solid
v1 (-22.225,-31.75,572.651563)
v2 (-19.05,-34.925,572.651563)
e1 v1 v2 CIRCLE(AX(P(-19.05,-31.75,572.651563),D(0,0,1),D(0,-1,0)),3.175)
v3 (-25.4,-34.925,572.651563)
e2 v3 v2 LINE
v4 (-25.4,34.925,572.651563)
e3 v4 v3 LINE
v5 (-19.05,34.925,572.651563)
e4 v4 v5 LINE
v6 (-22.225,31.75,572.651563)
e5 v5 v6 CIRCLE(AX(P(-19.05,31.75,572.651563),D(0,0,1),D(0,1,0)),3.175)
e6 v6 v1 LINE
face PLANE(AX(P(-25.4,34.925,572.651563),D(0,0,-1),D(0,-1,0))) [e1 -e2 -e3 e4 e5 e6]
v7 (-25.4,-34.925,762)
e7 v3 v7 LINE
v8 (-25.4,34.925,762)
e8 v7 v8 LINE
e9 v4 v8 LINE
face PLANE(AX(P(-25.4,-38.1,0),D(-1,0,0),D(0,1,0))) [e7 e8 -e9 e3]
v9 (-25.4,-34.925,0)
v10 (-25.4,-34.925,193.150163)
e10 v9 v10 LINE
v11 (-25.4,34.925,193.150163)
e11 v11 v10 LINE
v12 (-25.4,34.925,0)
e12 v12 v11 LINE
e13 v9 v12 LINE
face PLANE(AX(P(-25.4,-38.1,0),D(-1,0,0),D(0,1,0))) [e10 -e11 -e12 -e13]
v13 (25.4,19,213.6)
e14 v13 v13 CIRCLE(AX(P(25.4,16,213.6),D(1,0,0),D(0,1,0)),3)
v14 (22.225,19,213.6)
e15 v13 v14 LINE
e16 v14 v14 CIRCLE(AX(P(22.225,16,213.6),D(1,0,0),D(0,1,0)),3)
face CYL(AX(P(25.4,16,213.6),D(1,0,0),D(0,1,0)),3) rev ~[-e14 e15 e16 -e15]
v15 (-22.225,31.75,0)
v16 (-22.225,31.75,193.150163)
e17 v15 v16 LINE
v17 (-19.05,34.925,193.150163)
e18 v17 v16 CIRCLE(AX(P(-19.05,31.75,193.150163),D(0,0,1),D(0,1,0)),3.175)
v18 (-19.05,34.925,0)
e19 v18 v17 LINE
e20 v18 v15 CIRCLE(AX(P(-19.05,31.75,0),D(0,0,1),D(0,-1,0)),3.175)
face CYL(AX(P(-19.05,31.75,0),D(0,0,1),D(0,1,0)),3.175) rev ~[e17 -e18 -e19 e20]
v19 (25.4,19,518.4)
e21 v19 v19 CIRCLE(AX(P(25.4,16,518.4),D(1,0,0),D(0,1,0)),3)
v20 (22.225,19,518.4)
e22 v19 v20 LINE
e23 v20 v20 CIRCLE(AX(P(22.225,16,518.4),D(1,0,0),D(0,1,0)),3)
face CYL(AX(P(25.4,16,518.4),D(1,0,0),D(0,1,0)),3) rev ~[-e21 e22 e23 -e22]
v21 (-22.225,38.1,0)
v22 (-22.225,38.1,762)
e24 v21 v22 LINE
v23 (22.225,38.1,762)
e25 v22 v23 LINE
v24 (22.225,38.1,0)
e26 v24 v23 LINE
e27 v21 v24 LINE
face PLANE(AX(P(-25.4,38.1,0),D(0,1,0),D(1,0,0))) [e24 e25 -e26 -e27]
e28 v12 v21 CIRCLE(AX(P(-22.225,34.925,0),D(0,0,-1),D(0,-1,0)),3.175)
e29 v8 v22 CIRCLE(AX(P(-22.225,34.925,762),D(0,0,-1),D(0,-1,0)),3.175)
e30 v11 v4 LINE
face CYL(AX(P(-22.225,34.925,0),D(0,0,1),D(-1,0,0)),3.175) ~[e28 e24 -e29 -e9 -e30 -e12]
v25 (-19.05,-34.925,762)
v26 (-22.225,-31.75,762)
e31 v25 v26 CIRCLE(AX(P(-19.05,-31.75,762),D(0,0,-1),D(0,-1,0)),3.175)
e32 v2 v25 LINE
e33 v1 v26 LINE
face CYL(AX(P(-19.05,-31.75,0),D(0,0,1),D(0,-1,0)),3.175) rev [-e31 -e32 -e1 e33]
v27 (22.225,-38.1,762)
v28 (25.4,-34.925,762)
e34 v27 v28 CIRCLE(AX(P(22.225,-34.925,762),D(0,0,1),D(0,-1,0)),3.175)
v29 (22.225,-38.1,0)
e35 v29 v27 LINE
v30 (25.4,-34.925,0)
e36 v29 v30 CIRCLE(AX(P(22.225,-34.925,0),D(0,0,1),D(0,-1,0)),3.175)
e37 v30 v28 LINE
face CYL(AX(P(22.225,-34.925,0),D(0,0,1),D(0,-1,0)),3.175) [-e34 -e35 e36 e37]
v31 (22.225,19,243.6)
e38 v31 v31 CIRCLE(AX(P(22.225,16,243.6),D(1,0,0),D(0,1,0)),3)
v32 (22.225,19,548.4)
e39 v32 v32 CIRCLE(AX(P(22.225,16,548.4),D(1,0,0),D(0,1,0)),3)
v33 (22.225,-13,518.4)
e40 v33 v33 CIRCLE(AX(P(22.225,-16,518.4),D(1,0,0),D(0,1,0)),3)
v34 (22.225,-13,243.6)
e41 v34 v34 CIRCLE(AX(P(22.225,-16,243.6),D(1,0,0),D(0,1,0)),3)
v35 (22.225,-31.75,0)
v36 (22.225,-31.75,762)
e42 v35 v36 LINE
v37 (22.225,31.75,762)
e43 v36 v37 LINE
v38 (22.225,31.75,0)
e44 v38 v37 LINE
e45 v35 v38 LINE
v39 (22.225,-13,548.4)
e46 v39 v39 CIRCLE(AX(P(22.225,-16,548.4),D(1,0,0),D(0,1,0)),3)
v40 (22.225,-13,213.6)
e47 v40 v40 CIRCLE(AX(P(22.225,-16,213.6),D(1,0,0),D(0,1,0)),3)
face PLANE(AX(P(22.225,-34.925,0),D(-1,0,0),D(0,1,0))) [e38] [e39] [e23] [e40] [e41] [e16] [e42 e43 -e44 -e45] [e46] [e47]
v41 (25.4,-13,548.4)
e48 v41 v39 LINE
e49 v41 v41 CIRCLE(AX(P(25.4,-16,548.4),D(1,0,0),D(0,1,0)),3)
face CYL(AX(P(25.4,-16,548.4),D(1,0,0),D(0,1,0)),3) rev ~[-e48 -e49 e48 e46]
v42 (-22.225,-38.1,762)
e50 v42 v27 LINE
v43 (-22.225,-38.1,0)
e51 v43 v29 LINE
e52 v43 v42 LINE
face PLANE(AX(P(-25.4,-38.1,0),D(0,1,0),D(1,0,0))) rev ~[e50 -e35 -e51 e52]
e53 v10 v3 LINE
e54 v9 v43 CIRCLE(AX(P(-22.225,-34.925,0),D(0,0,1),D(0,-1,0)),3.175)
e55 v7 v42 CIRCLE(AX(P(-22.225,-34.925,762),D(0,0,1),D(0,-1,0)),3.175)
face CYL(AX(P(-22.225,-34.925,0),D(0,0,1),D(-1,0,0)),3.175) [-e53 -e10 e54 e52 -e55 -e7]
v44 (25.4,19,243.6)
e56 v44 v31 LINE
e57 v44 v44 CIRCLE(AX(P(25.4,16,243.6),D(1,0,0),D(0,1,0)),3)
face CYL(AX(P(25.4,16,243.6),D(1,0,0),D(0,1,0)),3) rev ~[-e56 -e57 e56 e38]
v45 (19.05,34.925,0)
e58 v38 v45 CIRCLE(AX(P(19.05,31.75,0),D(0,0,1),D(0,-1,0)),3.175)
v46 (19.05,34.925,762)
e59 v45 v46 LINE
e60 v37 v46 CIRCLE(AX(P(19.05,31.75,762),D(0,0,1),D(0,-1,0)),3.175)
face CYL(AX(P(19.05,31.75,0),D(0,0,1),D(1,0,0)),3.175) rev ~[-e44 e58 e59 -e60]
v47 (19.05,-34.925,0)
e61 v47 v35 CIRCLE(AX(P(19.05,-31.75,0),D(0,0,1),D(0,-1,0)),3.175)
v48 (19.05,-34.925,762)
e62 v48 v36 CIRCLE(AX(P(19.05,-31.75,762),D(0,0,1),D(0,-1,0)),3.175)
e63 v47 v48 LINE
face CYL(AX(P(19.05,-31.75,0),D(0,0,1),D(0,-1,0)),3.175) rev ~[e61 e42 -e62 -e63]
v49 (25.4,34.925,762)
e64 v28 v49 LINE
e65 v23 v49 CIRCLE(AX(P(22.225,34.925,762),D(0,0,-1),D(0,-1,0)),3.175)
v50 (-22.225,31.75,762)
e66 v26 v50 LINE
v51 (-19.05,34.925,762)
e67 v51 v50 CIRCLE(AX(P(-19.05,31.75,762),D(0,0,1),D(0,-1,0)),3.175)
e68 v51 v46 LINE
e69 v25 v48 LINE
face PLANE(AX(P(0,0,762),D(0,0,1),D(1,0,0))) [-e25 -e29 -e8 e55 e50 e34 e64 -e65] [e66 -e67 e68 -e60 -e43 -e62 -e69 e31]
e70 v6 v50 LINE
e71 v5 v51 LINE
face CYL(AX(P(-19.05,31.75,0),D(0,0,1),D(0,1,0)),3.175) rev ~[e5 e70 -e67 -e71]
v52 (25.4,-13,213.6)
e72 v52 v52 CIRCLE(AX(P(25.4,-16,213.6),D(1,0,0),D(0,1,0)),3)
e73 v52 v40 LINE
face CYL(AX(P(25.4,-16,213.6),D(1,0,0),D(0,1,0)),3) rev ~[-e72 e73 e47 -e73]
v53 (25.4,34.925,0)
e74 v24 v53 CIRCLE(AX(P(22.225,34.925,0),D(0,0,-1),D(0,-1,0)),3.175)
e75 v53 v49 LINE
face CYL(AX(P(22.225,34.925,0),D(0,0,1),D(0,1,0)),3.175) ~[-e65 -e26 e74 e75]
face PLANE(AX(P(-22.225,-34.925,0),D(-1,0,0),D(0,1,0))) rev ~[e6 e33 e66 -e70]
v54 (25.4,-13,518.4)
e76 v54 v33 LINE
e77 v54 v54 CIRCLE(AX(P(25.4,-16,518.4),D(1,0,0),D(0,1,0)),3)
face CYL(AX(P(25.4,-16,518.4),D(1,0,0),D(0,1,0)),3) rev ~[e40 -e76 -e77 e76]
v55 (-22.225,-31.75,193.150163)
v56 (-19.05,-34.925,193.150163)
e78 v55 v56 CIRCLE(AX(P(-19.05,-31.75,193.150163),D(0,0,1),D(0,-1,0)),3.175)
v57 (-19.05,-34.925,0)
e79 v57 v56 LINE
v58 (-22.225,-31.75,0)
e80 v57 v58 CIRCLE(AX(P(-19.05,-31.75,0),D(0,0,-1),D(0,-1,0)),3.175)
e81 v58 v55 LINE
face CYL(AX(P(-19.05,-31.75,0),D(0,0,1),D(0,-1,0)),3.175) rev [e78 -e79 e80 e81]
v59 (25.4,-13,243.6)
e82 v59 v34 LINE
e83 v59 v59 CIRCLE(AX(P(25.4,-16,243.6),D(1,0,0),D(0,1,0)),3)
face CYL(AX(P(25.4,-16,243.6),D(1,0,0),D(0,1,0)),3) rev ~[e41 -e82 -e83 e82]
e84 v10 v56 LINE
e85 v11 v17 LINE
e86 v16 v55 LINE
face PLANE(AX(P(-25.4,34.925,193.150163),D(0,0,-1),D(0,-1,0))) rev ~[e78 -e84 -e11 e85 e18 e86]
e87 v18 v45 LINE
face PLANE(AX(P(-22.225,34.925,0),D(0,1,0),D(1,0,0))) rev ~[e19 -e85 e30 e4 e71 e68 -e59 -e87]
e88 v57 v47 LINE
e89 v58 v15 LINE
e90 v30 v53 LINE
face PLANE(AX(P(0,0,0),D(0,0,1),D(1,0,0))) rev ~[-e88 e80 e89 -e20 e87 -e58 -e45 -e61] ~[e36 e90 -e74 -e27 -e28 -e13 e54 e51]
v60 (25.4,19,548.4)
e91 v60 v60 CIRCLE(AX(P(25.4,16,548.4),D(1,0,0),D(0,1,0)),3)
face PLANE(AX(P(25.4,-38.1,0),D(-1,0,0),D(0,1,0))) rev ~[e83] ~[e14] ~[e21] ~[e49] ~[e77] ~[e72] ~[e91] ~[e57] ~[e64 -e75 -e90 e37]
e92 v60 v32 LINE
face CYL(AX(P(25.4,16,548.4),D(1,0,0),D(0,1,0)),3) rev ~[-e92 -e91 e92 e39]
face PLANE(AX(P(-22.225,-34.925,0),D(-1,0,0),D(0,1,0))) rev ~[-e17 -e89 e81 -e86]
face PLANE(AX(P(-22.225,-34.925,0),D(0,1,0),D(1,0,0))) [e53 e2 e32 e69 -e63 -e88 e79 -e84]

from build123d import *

# Parameters (mm, degrees)
F0_W     = 50.8
F0_H     = 76.2
F0_W_2   = 44.45
F0_H_2   = 69.85
F2_DEPTH = 762
F3_R     = 3.175
F4_R     = 3
F5_DEPTH = 50.801
F6_W     = 69.85
F6_H     = 379.5014
F6_R     = 3
F7_DEPTH = 25.4


# Not quite as in the source:
# - a variable given as a bare number and used for a length is read in inches; the dataset says mm whatever the document's units were


with BuildPart() as f2:
    # F0 (on Top) → F2 (new body)
    with BuildSketch(Plane.XY):
        Rectangle(F0_W, F0_H)
        Rectangle(F0_W_2, F0_H_2, mode=Mode.SUBTRACT)
    extrude(amount=F2_DEPTH)

    # F3
    f3_edges = [f2.edges().sort_by_distance(p)[0] for p in [
        (-22.225, 34.925, 381),
        (22.225, 34.925, 381),
        (22.225, -34.925, 381),
        (-22.225, -34.925, 381),
        (25.4, 38.1, 381),
        (-25.4, 38.1, 381),
        (25.4, -38.1, 381),
        (-25.4, -38.1, 381),
    ]]
    fillet(f3_edges, radius=F3_R)

    # F4 (on face) → F5 (cut, through all)
    with BuildSketch(Plane.YZ.offset(25.4)):
        with Locations((-16, 213.6)):
            Circle(F4_R)
        with Locations((-16, 243.6)):
            Circle(F4_R)
        with Locations((16, 243.6)):
            Circle(F4_R)
        with Locations((16, 213.6)):
            Circle(F4_R)
        with Locations((-16, 518.4)):
            Circle(F4_R)
        with Locations((-16, 548.4)):
            Circle(F4_R)
        with Locations((16, 518.4)):
            Circle(F4_R)
        with Locations((16, 548.4)):
            Circle(F4_R)
    extrude(amount=-F5_DEPTH, mode=Mode.SUBTRACT)

    # F6 (on face) → F7 (cut)
    with BuildSketch(Plane(origin=(-25.4, 0, 0), x_dir=(0, -1, 0), z_dir=(-1, 0, 0))):
        with Locations((0, 382.9008626968)):
            Rectangle(F6_W, F6_H)
        with Locations((-16, 213.6)):
            Circle(F6_R, mode=Mode.SUBTRACT)
        with Locations((-16, 243.6)):
            Circle(F6_R, mode=Mode.SUBTRACT)
        with Locations((16, 213.6)):
            Circle(F6_R, mode=Mode.SUBTRACT)
        with Locations((16, 243.6)):
            Circle(F6_R, mode=Mode.SUBTRACT)
        with Locations((-16, 518.4)):
            Circle(F6_R, mode=Mode.SUBTRACT)
        with Locations((-16, 548.4)):
            Circle(F6_R, mode=Mode.SUBTRACT)
        with Locations((16, 518.4)):
            Circle(F6_R, mode=Mode.SUBTRACT)
        with Locations((16, 548.4)):
            Circle(F6_R, mode=Mode.SUBTRACT)
    extrude(amount=-F7_DEPTH, mode=Mode.SUBTRACT)


solid = f2.part
